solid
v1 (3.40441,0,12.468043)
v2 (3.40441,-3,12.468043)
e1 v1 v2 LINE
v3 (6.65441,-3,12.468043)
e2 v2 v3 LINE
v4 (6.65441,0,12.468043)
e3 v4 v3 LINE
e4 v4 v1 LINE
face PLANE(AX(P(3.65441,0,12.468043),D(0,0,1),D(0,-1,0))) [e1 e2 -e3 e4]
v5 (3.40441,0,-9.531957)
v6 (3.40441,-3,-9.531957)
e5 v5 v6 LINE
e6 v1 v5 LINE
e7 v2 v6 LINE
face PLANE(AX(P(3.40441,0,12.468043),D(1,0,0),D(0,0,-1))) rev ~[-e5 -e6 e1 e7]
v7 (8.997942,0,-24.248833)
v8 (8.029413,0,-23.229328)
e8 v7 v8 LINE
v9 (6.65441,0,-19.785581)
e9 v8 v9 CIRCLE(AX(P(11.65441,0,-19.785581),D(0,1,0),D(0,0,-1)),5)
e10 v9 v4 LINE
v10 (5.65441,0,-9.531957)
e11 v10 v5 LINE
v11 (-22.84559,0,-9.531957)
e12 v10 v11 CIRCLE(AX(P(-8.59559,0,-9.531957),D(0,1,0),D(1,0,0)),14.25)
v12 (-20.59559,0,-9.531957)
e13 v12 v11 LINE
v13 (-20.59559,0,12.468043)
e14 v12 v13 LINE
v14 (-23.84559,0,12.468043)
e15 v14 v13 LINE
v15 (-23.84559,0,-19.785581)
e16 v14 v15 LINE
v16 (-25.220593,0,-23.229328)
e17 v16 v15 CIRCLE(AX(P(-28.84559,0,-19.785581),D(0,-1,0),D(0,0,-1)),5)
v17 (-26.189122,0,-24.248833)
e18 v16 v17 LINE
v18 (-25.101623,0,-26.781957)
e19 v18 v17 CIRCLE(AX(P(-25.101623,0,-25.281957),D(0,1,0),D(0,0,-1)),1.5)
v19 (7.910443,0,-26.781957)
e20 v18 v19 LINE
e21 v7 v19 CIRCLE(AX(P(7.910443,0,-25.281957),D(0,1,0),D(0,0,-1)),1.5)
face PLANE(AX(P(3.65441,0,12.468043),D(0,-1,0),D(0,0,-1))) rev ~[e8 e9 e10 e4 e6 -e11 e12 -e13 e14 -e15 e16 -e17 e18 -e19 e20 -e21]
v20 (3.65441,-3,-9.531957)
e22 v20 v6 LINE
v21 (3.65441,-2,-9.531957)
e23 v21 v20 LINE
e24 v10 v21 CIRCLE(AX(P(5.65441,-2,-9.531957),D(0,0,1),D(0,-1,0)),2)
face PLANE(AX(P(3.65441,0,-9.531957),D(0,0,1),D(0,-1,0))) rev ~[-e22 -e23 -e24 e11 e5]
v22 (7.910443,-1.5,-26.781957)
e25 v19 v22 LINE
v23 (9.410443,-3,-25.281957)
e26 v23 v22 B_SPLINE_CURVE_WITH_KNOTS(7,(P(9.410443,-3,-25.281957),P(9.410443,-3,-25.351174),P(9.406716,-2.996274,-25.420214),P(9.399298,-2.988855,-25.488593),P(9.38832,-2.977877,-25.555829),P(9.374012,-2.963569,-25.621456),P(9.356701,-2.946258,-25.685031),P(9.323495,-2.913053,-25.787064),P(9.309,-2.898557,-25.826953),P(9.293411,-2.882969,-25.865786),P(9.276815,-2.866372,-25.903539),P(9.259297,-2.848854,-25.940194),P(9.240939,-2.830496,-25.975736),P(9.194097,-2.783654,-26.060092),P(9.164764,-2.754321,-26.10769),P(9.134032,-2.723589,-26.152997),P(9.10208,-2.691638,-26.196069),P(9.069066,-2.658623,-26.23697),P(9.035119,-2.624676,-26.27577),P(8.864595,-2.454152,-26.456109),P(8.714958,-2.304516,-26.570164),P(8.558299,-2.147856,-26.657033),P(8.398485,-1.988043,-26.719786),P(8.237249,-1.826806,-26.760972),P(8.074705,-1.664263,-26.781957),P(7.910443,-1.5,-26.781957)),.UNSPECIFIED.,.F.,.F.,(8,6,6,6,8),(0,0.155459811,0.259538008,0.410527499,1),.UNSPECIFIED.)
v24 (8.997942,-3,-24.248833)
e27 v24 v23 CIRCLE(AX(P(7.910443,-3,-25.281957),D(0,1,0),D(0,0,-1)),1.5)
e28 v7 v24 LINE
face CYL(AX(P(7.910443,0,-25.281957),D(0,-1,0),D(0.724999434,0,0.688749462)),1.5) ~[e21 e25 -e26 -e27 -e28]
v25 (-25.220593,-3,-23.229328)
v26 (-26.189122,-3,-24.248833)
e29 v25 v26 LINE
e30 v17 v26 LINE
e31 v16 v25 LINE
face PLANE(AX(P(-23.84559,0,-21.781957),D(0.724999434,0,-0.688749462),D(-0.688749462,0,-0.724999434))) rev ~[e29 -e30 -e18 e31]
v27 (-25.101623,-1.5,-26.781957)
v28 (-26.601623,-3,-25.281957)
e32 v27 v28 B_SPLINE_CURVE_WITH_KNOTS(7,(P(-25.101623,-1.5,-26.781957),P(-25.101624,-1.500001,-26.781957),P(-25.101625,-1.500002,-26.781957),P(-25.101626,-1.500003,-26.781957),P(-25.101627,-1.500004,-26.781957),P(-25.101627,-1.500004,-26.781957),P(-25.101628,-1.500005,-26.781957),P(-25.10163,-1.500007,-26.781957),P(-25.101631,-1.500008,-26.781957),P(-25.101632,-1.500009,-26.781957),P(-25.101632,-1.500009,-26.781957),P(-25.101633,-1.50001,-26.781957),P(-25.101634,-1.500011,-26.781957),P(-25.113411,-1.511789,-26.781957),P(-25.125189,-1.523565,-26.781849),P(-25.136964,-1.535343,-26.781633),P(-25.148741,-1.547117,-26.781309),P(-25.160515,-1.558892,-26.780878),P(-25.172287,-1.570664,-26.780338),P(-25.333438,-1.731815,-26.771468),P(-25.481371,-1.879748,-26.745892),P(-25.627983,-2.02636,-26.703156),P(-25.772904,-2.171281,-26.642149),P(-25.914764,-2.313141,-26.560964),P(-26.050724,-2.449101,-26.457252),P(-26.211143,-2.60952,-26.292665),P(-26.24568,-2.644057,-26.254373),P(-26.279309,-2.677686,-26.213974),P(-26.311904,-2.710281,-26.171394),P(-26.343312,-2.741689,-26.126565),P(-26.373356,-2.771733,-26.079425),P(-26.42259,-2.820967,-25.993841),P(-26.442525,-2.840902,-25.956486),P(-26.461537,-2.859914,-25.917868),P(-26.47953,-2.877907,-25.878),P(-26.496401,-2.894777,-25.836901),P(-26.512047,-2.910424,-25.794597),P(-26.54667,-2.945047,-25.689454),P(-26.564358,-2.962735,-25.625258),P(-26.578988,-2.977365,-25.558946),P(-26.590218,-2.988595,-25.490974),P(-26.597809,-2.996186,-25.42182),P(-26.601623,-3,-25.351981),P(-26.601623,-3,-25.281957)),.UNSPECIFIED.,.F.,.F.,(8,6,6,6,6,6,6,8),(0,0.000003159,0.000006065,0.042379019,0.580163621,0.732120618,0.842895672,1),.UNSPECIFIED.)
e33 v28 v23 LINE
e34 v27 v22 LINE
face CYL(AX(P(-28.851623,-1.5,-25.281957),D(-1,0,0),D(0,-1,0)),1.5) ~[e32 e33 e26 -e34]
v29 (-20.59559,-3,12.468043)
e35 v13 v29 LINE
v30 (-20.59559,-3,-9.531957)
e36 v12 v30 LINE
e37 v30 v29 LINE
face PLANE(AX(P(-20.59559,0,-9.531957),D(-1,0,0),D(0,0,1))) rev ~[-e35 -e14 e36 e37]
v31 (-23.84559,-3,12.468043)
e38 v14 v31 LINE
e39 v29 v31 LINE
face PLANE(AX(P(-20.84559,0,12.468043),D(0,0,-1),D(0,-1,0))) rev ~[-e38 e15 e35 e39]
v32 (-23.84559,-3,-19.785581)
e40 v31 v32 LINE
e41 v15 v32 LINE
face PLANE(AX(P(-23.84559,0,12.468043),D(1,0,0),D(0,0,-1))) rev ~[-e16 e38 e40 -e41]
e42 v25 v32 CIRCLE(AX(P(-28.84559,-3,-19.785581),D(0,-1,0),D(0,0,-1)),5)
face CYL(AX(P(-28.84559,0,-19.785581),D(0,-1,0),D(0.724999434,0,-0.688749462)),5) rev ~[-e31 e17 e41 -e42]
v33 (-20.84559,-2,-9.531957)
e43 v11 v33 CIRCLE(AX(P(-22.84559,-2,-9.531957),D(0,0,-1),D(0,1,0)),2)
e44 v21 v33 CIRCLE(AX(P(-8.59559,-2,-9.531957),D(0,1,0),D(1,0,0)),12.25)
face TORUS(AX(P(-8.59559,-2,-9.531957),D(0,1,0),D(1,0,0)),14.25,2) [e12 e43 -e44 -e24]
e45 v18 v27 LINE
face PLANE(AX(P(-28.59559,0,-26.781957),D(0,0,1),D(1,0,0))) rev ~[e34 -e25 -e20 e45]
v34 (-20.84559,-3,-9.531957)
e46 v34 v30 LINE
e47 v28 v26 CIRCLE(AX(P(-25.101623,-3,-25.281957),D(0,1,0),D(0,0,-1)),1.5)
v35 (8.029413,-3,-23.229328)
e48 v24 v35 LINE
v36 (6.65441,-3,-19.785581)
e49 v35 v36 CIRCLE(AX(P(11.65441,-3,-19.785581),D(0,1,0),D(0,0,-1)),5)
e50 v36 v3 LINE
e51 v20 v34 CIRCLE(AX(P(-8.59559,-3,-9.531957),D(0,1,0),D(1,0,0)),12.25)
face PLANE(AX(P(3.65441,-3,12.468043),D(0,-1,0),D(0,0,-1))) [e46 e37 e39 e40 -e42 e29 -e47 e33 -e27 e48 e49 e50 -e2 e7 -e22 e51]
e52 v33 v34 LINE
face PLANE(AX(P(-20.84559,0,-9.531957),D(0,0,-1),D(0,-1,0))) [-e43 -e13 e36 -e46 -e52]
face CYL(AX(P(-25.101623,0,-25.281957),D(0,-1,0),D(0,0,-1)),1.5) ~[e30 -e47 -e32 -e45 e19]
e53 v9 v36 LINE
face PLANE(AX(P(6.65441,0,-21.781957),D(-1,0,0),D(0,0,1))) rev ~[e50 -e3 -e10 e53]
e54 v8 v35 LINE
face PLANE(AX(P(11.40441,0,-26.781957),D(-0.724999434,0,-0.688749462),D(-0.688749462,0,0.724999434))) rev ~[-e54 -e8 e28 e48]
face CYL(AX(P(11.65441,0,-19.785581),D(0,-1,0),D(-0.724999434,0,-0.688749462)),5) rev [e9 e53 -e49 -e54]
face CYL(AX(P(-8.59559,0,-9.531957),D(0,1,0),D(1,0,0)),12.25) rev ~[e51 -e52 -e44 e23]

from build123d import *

# Parameters (mm, degrees)
F1_DEPTH    = 3
F2_DEPTH    = 0.25
F3_DEPTH    = 0.25
F4_R        = 2
F5_R        = 1.5
F6_R        = 5
F7_T1_DEPTH = 40.5120657328


# Not quite as in the source:
# - a fillet or chamfer that OpenCascade refuses, or shapes differently, is made with other operations: its cross-section is extruded or revolved along the edge and cut away or added


with BuildPart() as f1:
    # F0 (on Front) → F1 (new body)
    with BuildSketch(Plane.XZ):
        with BuildLine():
            ThreePointArc((3.6544098407, -9.5319570974), (-8.5955901593, -21.7819570974), (-20.8455901593, -9.5319570974))
            Line((-20.8455901593, -9.5319570974), (-20.8455901593, 12.4680429026))
            Line((-20.8455901593, 12.4680429026), (-23.8455901593, 12.4680429026))
            Line((-23.8455901593, 12.4680429026), (-23.8455901593, -9.5319570974))
            Line((-23.8455901593, -9.5319570974), (-23.8455901593, -21.7819570974))
            Line((-23.8455901593, -21.7819570974), (-28.5955901593, -26.7819570974))
            Line((-28.5955901593, -26.7819570974), (-8.5955901593, -26.7819570974))
            Line((-8.5955901593, -26.7819570974), (11.4044098407, -26.7819570974))
            Line((11.4044098407, -26.7819570974), (6.6544098407, -21.7819570974))
            Line((6.6544098407, -21.7819570974), (6.6544098407, 12.4680429026))
            Line((6.6544098407, 12.4680429026), (3.6544098407, 12.4680429026))
            Line((3.6544098407, 12.4680429026), (3.6544098407, -9.5319570974))
        make_face()
    extrude(amount=F1_DEPTH)

    # F2 (add): a face of the model
    f2_faces = [f1.faces().sort_by_distance(p)[0] for p in [
        (-20.8455901593, -1.5, 1.4680429026),
    ]]
    extrude(f2_faces, amount=F2_DEPTH)

    # F3 (add): a face of the model
    f3_faces = [f1.faces().sort_by_distance(p)[0] for p in [
        (3.6544098407, -1.5, 1.4680429026),
    ]]
    extrude(f3_faces, amount=F3_DEPTH)

    # F4
    f4_edges = [f1.edges().sort_by_distance(p)[0] for p in [
        (-8.59559, 0, -21.781957),
    ]]
    fillet(f4_edges, radius=F4_R)

    # F5
    f5_edges = [f1.edges().sort_by_distance(p)[0] for p in [
        (11.40441, -1.5, -26.781957),
        (-28.59559, -1.5, -26.781957),
    ]]
    fillet(f5_edges, radius=F5_R)

    # F6
    f6_edges = [f1.edges().sort_by_distance(p)[0] for p in [
        (-23.84559, -1.5, -21.781957),
        (6.65441, -1.5, -21.781957),
    ]]
    fillet(f6_edges, radius=F6_R)

    # F7: fillet of radius 1.5 on 1 edges, made by hand

    # F7_s2 → F7_t1 (cut)
    with BuildSketch(Plane.YZ.offset(-28.8516230257)):
        with BuildLine():
            ThreePointArc((-3, -25.2819570974), (-2.5606601718, -26.3426172691), (-1.5, -26.7819570974))
            Line((-1.5, -26.7819570974), (-3, -26.7819570974))
            Line((-3, -26.7819570974), (-3, -25.2819570974))
        make_face()
    extrude(amount=F7_T1_DEPTH, mode=Mode.SUBTRACT)


solid = f1.part
